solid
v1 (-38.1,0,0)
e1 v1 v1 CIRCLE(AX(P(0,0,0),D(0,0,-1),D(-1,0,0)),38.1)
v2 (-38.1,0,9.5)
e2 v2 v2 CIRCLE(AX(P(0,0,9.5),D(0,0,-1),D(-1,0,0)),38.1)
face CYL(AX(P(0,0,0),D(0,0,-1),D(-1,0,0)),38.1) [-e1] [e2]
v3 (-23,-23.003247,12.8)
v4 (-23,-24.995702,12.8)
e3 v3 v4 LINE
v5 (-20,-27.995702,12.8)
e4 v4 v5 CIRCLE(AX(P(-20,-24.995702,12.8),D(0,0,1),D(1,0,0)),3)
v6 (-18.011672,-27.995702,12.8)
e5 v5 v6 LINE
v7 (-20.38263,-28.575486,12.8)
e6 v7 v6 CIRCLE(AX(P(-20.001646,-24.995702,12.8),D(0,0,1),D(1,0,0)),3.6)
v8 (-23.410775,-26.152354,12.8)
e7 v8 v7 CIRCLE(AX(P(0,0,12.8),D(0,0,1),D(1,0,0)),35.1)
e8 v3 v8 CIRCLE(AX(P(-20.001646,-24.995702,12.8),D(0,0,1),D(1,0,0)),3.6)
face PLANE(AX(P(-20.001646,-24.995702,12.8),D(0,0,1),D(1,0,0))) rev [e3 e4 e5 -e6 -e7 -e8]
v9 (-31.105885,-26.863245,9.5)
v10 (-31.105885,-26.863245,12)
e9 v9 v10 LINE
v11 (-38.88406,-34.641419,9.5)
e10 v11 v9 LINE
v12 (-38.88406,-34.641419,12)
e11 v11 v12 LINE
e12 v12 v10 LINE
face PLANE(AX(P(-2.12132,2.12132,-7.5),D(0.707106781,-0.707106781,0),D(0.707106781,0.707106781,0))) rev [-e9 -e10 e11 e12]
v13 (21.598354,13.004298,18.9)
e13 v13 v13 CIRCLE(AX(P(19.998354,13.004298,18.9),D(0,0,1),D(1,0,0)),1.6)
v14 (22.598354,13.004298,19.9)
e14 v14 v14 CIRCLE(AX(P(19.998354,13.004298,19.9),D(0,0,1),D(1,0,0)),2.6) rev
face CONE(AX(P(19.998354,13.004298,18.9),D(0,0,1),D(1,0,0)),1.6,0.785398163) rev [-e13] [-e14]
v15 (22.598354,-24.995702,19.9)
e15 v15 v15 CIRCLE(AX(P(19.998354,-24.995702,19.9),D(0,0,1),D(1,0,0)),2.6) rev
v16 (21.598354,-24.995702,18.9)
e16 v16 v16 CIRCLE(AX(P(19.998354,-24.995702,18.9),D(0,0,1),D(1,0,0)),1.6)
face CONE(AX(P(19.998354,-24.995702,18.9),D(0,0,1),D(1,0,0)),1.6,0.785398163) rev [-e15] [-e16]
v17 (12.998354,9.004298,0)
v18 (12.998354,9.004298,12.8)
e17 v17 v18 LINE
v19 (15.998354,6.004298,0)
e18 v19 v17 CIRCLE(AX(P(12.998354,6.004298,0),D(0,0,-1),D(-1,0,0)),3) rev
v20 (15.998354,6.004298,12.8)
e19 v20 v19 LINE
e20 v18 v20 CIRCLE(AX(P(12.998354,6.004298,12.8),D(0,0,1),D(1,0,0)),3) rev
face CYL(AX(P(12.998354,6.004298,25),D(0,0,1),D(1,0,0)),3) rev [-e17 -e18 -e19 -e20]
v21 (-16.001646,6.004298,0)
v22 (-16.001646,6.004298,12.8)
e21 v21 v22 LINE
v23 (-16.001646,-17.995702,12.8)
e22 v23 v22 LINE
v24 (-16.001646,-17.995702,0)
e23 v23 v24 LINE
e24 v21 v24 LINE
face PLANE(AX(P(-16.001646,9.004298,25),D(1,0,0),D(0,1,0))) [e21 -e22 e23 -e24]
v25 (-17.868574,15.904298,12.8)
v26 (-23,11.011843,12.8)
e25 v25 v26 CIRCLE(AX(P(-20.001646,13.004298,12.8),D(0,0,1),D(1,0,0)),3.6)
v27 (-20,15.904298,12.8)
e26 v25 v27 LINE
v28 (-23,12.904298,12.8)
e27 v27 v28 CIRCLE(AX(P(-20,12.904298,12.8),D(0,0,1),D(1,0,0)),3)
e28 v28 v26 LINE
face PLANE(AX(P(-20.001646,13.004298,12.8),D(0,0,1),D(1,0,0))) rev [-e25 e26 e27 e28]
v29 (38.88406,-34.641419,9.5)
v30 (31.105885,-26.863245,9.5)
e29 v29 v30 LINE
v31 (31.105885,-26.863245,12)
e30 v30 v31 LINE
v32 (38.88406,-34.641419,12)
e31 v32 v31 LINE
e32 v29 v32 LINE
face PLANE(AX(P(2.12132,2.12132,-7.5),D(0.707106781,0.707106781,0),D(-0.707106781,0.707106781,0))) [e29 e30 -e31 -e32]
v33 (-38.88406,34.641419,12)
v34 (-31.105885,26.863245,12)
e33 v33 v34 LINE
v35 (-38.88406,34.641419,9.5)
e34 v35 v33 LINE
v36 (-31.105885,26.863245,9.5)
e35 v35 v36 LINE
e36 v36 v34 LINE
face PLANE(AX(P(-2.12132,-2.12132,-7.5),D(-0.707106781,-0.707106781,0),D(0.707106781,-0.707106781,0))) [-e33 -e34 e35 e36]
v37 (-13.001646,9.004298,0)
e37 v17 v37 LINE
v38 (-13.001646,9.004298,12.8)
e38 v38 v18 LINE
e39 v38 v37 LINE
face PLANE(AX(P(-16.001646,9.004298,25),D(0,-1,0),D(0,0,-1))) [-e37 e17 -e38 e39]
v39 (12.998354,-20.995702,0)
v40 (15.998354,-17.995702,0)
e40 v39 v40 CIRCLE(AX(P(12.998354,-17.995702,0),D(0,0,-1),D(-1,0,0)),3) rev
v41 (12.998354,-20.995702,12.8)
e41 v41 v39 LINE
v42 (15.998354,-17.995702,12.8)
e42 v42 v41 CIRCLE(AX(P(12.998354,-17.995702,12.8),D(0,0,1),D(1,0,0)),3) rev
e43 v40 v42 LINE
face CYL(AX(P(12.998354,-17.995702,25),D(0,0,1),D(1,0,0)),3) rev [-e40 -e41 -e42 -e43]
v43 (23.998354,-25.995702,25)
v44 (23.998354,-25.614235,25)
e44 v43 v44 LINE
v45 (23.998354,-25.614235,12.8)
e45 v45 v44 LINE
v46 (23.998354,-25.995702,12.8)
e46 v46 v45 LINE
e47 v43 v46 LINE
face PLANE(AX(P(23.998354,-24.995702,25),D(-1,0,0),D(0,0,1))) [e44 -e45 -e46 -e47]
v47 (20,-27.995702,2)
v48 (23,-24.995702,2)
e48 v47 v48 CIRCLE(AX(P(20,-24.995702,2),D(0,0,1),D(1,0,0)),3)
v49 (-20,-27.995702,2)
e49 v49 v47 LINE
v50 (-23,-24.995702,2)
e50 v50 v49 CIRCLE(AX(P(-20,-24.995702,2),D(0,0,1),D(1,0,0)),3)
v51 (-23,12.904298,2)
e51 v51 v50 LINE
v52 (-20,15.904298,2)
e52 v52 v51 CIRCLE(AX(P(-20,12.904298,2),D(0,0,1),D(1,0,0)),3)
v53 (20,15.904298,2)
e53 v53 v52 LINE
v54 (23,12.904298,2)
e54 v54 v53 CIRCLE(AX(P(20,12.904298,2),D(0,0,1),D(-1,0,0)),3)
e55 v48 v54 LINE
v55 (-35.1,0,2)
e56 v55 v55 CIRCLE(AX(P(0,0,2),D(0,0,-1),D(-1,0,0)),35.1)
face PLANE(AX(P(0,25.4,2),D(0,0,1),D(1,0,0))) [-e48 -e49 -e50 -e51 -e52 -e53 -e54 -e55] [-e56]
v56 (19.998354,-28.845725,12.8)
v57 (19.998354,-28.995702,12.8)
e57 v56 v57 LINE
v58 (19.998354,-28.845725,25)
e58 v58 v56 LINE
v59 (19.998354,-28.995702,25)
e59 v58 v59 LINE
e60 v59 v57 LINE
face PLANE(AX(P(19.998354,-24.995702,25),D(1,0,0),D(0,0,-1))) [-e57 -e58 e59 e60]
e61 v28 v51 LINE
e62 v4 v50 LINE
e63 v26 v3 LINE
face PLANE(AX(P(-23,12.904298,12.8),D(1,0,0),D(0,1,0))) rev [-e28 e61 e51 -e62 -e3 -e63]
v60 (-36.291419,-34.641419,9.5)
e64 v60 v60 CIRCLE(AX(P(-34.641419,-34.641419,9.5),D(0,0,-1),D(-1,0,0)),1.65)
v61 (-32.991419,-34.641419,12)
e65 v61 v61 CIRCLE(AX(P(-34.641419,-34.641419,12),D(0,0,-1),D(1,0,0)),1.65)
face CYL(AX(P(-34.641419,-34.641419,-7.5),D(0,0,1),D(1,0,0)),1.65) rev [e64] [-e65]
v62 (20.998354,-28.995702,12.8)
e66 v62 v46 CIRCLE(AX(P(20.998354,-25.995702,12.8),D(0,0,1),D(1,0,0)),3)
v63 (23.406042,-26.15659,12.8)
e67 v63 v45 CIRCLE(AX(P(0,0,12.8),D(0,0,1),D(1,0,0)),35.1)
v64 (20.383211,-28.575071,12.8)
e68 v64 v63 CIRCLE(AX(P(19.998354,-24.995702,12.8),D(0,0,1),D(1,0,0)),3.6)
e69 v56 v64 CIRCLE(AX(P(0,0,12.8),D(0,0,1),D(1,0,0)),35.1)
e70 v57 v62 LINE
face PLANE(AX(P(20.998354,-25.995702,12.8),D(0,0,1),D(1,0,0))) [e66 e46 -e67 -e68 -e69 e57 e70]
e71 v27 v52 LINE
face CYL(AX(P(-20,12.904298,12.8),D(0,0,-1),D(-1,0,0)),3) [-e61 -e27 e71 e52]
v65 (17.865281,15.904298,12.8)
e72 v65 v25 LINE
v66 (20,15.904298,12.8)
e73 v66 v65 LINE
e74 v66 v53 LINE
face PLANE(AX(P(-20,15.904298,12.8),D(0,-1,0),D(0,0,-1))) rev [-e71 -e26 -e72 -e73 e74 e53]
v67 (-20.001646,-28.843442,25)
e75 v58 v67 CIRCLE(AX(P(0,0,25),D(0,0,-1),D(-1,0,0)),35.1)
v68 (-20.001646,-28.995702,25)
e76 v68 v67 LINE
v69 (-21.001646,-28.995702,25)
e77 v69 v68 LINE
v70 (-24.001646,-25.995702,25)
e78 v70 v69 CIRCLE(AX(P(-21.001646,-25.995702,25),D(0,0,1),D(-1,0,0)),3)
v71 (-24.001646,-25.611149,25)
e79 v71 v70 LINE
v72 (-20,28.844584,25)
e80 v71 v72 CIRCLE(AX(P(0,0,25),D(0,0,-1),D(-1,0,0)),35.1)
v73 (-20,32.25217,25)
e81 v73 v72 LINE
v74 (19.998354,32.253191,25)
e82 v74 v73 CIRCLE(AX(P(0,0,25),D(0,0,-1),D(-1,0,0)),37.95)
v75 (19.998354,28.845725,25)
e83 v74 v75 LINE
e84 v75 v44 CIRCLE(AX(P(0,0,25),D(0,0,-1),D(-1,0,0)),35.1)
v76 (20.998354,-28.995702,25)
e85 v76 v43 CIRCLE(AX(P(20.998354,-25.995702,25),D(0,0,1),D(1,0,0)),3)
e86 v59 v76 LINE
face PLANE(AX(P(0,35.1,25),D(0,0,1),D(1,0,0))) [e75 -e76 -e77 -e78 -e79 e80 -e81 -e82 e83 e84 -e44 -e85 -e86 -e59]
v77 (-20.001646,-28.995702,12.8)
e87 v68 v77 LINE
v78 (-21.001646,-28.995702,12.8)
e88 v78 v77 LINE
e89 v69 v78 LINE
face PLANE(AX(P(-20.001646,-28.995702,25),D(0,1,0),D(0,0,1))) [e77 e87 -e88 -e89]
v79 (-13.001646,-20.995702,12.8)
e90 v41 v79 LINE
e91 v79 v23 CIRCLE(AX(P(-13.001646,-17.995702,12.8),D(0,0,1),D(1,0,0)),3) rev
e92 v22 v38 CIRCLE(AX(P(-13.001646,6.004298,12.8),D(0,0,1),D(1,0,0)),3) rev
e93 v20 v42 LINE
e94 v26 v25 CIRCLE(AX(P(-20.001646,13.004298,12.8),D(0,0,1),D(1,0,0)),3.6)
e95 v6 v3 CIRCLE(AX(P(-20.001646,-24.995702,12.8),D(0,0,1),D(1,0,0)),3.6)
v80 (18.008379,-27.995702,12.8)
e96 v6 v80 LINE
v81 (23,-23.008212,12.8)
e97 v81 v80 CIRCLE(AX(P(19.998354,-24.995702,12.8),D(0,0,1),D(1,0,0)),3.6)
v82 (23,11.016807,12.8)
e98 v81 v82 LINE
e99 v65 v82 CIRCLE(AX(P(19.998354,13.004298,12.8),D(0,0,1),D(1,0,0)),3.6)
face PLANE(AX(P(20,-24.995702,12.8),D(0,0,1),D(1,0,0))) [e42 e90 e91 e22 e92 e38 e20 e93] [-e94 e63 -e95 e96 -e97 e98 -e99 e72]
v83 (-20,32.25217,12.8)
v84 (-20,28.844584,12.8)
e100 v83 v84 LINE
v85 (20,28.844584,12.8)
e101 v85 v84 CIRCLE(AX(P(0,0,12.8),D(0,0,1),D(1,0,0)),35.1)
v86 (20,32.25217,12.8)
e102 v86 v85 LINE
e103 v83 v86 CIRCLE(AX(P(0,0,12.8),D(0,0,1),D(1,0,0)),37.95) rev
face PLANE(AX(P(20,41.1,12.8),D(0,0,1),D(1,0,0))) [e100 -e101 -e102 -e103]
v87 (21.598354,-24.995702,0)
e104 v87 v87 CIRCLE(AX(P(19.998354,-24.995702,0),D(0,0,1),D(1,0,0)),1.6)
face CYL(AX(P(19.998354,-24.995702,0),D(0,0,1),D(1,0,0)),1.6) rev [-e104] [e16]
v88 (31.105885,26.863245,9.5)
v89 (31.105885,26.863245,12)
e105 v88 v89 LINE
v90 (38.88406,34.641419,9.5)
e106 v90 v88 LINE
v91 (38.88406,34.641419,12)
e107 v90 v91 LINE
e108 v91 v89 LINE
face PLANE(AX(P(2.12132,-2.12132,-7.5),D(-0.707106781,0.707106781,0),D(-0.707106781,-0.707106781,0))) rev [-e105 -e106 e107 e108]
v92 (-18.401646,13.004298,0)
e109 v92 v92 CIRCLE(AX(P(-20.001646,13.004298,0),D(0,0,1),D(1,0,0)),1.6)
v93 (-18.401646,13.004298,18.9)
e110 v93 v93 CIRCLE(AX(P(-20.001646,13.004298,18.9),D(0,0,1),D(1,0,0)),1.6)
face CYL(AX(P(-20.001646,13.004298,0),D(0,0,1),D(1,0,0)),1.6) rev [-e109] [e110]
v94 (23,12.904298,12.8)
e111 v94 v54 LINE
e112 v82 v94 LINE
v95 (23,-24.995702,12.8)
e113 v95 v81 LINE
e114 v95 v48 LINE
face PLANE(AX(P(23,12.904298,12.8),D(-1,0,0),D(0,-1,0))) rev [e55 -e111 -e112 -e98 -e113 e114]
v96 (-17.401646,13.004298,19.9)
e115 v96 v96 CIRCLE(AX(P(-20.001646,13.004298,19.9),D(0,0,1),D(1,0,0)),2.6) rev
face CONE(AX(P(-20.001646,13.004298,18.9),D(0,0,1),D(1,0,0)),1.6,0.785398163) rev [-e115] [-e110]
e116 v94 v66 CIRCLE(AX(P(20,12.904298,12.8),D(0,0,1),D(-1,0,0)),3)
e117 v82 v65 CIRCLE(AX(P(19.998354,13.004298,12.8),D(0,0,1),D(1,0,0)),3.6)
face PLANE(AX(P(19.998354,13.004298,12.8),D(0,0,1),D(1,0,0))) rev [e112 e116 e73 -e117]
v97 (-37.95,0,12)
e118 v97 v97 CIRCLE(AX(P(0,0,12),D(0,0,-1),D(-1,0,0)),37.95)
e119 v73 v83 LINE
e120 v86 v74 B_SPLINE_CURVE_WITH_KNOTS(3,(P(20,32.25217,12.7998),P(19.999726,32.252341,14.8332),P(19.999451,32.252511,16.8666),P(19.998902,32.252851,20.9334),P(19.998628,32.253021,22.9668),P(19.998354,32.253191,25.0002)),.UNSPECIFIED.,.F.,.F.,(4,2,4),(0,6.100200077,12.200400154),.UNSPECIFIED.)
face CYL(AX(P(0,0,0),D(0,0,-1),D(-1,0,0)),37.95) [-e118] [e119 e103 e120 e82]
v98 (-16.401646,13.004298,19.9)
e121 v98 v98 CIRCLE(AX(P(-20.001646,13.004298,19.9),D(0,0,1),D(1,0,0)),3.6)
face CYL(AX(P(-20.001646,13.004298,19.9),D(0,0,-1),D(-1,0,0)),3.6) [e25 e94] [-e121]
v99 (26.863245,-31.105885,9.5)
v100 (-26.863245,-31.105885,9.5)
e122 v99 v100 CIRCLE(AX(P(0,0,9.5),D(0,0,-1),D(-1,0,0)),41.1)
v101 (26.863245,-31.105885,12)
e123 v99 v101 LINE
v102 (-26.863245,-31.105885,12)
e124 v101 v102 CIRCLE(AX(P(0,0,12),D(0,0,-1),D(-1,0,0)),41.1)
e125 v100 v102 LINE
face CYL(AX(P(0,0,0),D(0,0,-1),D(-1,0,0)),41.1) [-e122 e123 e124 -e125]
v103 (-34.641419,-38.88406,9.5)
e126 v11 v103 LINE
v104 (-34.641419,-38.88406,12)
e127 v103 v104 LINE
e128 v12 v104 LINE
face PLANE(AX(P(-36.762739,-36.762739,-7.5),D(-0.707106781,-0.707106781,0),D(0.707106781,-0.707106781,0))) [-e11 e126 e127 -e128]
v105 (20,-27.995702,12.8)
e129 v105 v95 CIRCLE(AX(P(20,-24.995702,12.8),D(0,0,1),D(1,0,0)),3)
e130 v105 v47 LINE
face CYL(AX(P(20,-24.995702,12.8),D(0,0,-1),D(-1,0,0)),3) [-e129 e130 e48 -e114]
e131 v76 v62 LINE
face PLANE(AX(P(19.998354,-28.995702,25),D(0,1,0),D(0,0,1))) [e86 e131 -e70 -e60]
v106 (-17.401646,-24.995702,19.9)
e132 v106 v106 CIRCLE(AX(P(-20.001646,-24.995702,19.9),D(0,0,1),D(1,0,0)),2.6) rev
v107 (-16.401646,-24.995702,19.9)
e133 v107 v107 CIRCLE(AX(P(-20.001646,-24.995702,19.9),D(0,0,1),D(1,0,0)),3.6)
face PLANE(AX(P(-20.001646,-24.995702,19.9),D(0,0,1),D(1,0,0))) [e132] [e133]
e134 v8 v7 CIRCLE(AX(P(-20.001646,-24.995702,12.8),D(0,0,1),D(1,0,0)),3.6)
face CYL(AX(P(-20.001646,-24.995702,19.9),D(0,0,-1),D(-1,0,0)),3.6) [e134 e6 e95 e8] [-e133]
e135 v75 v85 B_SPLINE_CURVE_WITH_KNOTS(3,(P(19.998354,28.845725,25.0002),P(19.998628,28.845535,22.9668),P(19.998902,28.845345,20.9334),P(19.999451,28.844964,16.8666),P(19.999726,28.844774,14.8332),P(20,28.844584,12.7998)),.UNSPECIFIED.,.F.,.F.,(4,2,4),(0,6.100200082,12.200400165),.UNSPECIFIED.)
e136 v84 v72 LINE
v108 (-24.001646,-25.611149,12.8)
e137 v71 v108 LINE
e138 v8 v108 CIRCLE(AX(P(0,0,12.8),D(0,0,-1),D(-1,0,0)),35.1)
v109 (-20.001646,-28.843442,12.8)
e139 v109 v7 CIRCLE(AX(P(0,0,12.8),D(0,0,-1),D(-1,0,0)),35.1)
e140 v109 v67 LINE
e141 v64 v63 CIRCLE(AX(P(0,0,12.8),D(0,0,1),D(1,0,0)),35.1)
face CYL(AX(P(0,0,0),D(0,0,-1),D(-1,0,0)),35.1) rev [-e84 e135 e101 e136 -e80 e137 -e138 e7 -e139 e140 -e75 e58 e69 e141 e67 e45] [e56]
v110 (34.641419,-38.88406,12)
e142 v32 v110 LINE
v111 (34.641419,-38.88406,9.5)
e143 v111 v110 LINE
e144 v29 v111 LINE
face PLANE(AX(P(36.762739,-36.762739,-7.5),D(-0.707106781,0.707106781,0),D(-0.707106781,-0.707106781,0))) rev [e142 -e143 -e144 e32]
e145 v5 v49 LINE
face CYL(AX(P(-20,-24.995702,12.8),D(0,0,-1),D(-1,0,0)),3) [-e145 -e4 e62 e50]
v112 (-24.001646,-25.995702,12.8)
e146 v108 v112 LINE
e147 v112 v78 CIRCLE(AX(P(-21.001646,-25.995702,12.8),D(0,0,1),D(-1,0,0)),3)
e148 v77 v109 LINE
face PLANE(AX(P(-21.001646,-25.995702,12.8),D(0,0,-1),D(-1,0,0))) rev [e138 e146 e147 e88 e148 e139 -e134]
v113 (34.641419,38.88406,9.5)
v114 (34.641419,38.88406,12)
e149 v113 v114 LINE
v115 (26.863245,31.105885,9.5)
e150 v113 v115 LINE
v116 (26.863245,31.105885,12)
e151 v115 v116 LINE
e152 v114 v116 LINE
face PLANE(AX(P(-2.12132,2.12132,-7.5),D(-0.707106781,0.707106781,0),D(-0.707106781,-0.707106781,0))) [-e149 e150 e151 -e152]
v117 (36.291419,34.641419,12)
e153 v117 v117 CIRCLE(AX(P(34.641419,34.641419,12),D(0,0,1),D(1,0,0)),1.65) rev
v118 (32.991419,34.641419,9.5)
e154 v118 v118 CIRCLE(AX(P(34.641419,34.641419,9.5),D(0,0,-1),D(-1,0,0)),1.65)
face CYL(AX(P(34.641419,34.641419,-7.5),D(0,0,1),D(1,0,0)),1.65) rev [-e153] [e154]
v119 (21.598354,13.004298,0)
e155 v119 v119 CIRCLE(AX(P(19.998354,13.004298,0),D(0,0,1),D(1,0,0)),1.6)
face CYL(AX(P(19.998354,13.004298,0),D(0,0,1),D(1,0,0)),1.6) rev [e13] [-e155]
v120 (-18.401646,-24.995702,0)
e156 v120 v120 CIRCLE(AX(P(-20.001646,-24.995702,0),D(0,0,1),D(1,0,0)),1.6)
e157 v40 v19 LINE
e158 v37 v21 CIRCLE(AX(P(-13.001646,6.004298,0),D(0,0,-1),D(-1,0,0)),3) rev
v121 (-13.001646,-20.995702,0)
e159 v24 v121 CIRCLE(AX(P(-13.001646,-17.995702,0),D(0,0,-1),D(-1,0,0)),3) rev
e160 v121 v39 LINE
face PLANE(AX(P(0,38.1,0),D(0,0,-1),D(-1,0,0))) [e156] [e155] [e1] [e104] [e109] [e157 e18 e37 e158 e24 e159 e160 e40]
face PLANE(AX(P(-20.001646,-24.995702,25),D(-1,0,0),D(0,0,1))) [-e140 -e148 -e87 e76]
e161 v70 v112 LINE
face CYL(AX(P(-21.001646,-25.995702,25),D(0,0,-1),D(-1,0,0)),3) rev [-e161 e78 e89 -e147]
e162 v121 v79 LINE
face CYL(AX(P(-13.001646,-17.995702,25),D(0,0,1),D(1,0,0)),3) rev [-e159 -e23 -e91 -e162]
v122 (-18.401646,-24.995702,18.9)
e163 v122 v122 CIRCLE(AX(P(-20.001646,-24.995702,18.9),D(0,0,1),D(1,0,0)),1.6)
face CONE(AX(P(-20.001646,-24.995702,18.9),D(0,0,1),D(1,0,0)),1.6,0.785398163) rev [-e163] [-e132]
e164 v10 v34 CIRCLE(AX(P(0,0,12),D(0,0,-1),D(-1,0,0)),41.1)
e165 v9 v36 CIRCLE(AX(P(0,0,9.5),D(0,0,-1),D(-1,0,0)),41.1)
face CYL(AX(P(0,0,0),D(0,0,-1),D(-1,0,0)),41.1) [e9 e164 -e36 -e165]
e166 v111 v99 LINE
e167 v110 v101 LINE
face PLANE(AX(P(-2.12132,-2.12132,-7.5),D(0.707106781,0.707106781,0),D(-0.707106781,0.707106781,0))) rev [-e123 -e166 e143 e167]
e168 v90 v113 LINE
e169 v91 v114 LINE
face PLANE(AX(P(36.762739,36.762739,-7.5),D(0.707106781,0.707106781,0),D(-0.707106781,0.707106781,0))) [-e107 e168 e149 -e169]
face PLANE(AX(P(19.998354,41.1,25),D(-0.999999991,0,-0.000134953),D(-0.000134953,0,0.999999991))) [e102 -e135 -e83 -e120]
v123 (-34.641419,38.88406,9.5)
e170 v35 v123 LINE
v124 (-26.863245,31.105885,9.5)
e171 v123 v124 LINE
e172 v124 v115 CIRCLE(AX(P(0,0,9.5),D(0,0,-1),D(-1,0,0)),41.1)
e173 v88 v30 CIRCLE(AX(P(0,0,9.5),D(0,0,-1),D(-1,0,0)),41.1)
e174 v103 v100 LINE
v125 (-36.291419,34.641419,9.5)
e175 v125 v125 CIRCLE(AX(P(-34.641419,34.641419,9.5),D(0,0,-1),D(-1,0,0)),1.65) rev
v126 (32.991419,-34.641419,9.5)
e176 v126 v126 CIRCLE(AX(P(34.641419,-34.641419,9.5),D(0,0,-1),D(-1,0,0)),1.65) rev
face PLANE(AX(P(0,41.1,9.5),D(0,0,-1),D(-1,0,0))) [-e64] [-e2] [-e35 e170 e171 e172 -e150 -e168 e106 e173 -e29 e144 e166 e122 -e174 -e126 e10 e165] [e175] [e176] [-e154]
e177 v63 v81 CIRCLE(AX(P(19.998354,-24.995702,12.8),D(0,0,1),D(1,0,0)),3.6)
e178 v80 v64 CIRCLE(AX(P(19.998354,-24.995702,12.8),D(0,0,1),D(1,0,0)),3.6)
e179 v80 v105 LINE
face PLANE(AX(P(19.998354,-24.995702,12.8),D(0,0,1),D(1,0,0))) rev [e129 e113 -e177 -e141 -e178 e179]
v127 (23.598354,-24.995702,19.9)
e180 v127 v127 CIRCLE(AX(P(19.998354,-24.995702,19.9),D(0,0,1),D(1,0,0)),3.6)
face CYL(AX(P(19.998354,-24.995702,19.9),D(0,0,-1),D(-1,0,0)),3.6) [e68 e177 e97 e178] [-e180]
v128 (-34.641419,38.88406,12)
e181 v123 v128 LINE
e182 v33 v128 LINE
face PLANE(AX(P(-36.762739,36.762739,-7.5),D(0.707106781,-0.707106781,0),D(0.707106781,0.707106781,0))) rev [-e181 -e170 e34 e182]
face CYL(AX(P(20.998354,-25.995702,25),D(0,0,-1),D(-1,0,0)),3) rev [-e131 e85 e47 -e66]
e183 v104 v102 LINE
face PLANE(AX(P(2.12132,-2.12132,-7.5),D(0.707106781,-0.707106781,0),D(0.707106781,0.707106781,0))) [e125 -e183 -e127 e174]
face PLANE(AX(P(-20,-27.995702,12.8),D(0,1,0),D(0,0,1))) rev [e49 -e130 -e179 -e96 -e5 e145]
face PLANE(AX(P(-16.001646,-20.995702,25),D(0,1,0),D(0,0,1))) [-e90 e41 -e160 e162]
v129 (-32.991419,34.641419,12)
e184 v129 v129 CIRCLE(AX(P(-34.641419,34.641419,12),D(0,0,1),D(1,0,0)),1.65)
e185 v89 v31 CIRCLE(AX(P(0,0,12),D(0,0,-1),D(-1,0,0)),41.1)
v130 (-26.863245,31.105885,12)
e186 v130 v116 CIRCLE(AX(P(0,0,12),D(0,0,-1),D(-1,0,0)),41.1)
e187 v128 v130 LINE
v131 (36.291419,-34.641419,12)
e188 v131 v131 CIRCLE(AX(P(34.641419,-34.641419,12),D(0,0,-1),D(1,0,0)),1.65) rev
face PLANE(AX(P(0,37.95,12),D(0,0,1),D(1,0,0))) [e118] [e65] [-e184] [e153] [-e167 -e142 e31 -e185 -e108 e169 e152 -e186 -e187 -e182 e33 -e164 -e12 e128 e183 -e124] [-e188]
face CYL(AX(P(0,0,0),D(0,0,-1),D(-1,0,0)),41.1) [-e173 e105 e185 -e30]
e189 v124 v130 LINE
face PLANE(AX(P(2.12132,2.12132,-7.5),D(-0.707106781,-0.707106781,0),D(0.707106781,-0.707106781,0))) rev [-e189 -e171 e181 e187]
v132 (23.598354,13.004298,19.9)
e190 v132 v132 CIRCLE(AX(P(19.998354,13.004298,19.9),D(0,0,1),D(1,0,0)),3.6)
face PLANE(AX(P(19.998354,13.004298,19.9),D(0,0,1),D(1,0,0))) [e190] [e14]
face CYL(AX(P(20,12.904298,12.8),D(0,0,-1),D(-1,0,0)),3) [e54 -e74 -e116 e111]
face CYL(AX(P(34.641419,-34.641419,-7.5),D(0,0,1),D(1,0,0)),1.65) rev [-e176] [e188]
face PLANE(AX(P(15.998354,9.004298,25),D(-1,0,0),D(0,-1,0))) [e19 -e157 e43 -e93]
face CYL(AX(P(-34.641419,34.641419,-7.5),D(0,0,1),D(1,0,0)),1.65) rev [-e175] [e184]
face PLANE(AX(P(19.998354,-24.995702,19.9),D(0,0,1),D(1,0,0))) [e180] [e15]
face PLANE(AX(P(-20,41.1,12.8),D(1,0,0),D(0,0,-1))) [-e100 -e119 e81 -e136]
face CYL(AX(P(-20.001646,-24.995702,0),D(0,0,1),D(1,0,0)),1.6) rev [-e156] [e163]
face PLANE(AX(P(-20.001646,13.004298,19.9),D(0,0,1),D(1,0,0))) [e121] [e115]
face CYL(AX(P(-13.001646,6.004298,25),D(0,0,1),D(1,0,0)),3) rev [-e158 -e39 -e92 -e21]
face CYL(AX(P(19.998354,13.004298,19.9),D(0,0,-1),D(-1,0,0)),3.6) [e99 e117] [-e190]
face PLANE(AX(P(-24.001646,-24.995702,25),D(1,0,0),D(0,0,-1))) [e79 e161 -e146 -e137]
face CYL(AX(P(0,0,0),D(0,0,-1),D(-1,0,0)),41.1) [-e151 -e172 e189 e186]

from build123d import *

# Parameters (mm, degrees)
BOSS_EXTRUDE1_DEPTH     = 10.8
CUT_EXTRUDE1_DEPTH      = 63.509359299
CUT_EXTRUDE1_DEPTH_BACK = 63.509359299
SKETCH14_W              = 32
SKETCH14_H              = 30
CUT_EXTRUDE3_DEPTH      = 60.51688836
FILLET1_R               = 3
SKETCH16_R              = 1.6
CUT_EXTRUDE2_DEPTH      = 60.51688836
CUT_EXTRUDE4_DEPTH      = 75.590213715
BOSS_EXTRUDE3_START     = -2.5
BOSS_EXTRUDE3_OUTLINE_R = 1.65
BOSS_EXTRUDE3_DEPTH     = 2.5
BOSS_EXTRUDE4_START     = 7.1
SKETCH24_R              = 3.6
SKETCH24_R_2            = 1.6
BOSS_EXTRUDE4_DEPTH     = 7.1
CHAMFER1_SIZE           = 1


# Read off the part's stored shape, not the designer's step: Boss-Extrude3
with BuildPart() as part:
    # Sketch6 → Revolve1 (revolve)
    with BuildSketch(Plane(origin=(0, 0, 0), x_dir=(0, 0, -1), z_dir=(1, 0, 0)), mode=Mode.PRIVATE) as revolve1_sk:
        Polygon((-2, 25.4), (-2, 35.1), (-25, 35.1), (-25, 37.95), (-12, 37.95), (-12, 41.1), (-9.5, 41.1), (-9.5, 38.1), (0, 38.1), (0, 25.4), (0, 0), (-2, 0), align=None)
    revolve(revolve1_sk.sketch.rotate(Axis((0, 0, 0), (0, 0, 1)), 90), axis=Axis((0, 0, 0), (0, 0, 1)))

    # Sketch15 → Boss-Extrude1 (add)
    with BuildSketch(Plane.XY.offset(2)):
        with BuildLine():
            Line((-20, 15.904297927), (20, 15.904297927))
            ThreePointArc((20, 15.904297927), (22.121320344, 15.02561827), (23, 12.904297927))
            Line((23, 12.904297927), (23, -24.995702073))
            ThreePointArc((23, -24.995702073), (22.121320344, -27.117022417), (20, -27.995702073))
            Line((20, -27.995702073), (-20, -27.995702073))
            ThreePointArc((-20, -27.995702073), (-22.121320344, -27.117022417), (-23, -24.995702073))
            Line((-23, -24.995702073), (-23, 12.904297927))
            ThreePointArc((-23, 12.904297927), (-22.121320344, 15.02561827), (-20, 15.904297927))
        make_face()
    extrude(amount=BOSS_EXTRUDE1_DEPTH)

    # Sketch14 → Cut-Extrude1 (cut, two sides: drawn at the far end of the back side and taken through both)
    with BuildSketch(Plane.XY.offset(2).offset(-CUT_EXTRUDE1_DEPTH_BACK)):
        with Locations((-0.00164643, -5.995702073)):
            Rectangle(SKETCH14_W, SKETCH14_H)
    extrude(amount=CUT_EXTRUDE1_DEPTH + CUT_EXTRUDE1_DEPTH_BACK, mode=Mode.SUBTRACT)

    # Sketch18 → Cut-Extrude3 (cut, through all)
    with BuildSketch(Plane.XY.offset(12.8)):
        with BuildLine():
            Line((19.99835357, -24.995702073), (23.99835357, -24.995702073))
            Line((23.99835357, -24.995702073), (23.99835357, -25.995702073))
            ThreePointArc((23.99835357, -25.995702073), (23.119673914, -28.117022417), (20.99835357, -28.995702073))
            Line((20.99835357, -28.995702073), (19.99835357, -28.995702073))
            Line((19.99835357, -28.995702073), (19.99835357, -24.995702073))
        make_face()
        with BuildLine():
            Line((-20.00164643, -24.995702073), (-24.00164643, -24.995702073))
            Line((-24.00164643, -24.995702073), (-24.00164643, -25.995702073))
            ThreePointArc((-24.00164643, -25.995702073), (-23.122966774, -28.117022417), (-21.00164643, -28.995702073))
            Line((-21.00164643, -28.995702073), (-20.00164643, -28.995702073))
            Line((-20.00164643, -28.995702073), (-20.00164643, -24.995702073))
        make_face()
    extrude(amount=CUT_EXTRUDE3_DEPTH, mode=Mode.SUBTRACT)

    # Fillet1
    fillet1_edges = [part.edges().sort_by_distance(p)[0] for p in [
        (-16.00164643, 9.004297927, 6.4),
        (-16.00164643, -20.995702073, 6.4),
        (15.99835357, -20.995702073, 6.4),
        (15.99835357, 9.004297927, 6.4),
    ]]
    fillet(fillet1_edges, radius=FILLET1_R)

    # Sketch16 → Cut-Extrude2 (cut, through all)
    with BuildSketch(Plane.XY.offset(12.8)):
        with Locations((-20.00164643, 13.004297927)):
            Circle(SKETCH16_R)
        with Locations((-20.00164643, -24.995702073)):
            Circle(SKETCH16_R)
        with Locations((19.99835357, -24.995702073)):
            Circle(SKETCH16_R)
        with Locations((19.99835357, 13.004297927)):
            Circle(SKETCH16_R)
    extrude(amount=-CUT_EXTRUDE2_DEPTH, mode=Mode.SUBTRACT)

    # Sketch20 → Cut-Extrude4 (cut, through all)
    with BuildSketch(Plane(origin=(0, 15.904297927, 0), x_dir=(1, 0, 0), z_dir=(0, 1, 0))):
        Polygon((20, -12.8), (-20, -12.8), (-20, -25), (19.99835357, -25), align=None)
    extrude(amount=CUT_EXTRUDE4_DEPTH, mode=Mode.SUBTRACT)

    # Boss-Extrude3 outline → Boss-Extrude3 (add)
    # profile 1 of 2: a face of its own
    with BuildSketch(Plane.XY.offset(12).offset(BOSS_EXTRUDE3_START)):
        with BuildLine():
            Line((-26.863244514, 31.105885201), (-34.641419107, 38.884059794))
            Line((-34.641419107, 38.884059794), (-38.884059794, 34.641419107))
            Line((-38.884059794, 34.641419107), (-31.105885201, 26.863244514))
            ThreePointArc((-31.105885201, 26.863244514), (-29.062088707, 29.062088707), (-26.863244514, 31.105885201))
        make_face()
        with Locations((-34.641419107, 34.641419107)):
            Circle(BOSS_EXTRUDE3_OUTLINE_R, mode=Mode.SUBTRACT)
    # profile 2 of 2: a face of its own
    with BuildSketch(Plane.XY.offset(12).offset(BOSS_EXTRUDE3_START)):
        with BuildLine():
            Line((34.641419107, 38.884059794), (26.863244514, 31.105885201))
            ThreePointArc((26.863244514, 31.105885201), (29.062088707, 29.062088707), (31.105885201, 26.863244514))
            Line((31.105885201, 26.863244514), (38.884059794, 34.641419107))
            Line((38.884059794, 34.641419107), (34.641419107, 38.884059794))
        make_face()
        with Locations((34.641419107, 34.641419107)):
            Circle(BOSS_EXTRUDE3_OUTLINE_R, mode=Mode.SUBTRACT)
    boss_extrude3 = extrude(amount=BOSS_EXTRUDE3_DEPTH)

    # Sketch24 → Boss-Extrude4 (add)
    # profile 1 of 4: a face of its own
    with BuildSketch(Plane.XY.offset(12.8).offset(BOSS_EXTRUDE4_START)):
        with Locations(Location((-20.00164643, 13.004297927, 0), (0, 0, 213.6046846))):
            Circle(SKETCH24_R)
        with Locations((-20.00164643, 13.004297927)):
            Circle(SKETCH24_R_2, mode=Mode.SUBTRACT)
    # profile 2 of 4: a face of its own
    with BuildSketch(Plane.XY.offset(12.8).offset(BOSS_EXTRUDE4_START)):
        with Locations(Location((19.99835357, 13.004297927, 0), (0, 0, 126.336057515))):
            Circle(SKETCH24_R)
        with Locations((19.99835357, 13.004297927)):
            Circle(SKETCH24_R_2, mode=Mode.SUBTRACT)
    # profile 3 of 4: a face of its own
    with BuildSketch(Plane.XY.offset(12.8).offset(BOSS_EXTRUDE4_START)):
        with Locations(Location((-20.00164643, -24.995702073, 0), (0, 0, 198.741091164))):
            Circle(SKETCH24_R)
        with Locations((-20.00164643, -24.995702073)):
            Circle(SKETCH24_R_2, mode=Mode.SUBTRACT)
    # profile 4 of 4: a face of its own
    with BuildSketch(Plane.XY.offset(12.8).offset(BOSS_EXTRUDE4_START)):
        with Locations(Location((19.99835357, -24.995702073, 0), (0, 0, 236.442690237))):
            Circle(SKETCH24_R)
        with Locations((19.99835357, -24.995702073)):
            Circle(SKETCH24_R_2, mode=Mode.SUBTRACT)
    extrude(amount=-BOSS_EXTRUDE4_DEPTH)

    # Chamfer1
    chamfer1_edges = [part.edges().sort_by_distance(p)[0] for p in [
        (-21.60164643, 13.004297927, 19.9),
        (18.39835357, 13.004297927, 19.9),
        (-21.60164643, -24.995702073, 19.9),
        (18.39835357, -24.995702073, 19.9),
    ]]
    chamfer(chamfer1_edges, length=CHAMFER1_SIZE)

    # Mirror1: Boss-Extrude3 across plane
    add(boss_extrude3.mirror(Plane.ZX))


solid = part.part
